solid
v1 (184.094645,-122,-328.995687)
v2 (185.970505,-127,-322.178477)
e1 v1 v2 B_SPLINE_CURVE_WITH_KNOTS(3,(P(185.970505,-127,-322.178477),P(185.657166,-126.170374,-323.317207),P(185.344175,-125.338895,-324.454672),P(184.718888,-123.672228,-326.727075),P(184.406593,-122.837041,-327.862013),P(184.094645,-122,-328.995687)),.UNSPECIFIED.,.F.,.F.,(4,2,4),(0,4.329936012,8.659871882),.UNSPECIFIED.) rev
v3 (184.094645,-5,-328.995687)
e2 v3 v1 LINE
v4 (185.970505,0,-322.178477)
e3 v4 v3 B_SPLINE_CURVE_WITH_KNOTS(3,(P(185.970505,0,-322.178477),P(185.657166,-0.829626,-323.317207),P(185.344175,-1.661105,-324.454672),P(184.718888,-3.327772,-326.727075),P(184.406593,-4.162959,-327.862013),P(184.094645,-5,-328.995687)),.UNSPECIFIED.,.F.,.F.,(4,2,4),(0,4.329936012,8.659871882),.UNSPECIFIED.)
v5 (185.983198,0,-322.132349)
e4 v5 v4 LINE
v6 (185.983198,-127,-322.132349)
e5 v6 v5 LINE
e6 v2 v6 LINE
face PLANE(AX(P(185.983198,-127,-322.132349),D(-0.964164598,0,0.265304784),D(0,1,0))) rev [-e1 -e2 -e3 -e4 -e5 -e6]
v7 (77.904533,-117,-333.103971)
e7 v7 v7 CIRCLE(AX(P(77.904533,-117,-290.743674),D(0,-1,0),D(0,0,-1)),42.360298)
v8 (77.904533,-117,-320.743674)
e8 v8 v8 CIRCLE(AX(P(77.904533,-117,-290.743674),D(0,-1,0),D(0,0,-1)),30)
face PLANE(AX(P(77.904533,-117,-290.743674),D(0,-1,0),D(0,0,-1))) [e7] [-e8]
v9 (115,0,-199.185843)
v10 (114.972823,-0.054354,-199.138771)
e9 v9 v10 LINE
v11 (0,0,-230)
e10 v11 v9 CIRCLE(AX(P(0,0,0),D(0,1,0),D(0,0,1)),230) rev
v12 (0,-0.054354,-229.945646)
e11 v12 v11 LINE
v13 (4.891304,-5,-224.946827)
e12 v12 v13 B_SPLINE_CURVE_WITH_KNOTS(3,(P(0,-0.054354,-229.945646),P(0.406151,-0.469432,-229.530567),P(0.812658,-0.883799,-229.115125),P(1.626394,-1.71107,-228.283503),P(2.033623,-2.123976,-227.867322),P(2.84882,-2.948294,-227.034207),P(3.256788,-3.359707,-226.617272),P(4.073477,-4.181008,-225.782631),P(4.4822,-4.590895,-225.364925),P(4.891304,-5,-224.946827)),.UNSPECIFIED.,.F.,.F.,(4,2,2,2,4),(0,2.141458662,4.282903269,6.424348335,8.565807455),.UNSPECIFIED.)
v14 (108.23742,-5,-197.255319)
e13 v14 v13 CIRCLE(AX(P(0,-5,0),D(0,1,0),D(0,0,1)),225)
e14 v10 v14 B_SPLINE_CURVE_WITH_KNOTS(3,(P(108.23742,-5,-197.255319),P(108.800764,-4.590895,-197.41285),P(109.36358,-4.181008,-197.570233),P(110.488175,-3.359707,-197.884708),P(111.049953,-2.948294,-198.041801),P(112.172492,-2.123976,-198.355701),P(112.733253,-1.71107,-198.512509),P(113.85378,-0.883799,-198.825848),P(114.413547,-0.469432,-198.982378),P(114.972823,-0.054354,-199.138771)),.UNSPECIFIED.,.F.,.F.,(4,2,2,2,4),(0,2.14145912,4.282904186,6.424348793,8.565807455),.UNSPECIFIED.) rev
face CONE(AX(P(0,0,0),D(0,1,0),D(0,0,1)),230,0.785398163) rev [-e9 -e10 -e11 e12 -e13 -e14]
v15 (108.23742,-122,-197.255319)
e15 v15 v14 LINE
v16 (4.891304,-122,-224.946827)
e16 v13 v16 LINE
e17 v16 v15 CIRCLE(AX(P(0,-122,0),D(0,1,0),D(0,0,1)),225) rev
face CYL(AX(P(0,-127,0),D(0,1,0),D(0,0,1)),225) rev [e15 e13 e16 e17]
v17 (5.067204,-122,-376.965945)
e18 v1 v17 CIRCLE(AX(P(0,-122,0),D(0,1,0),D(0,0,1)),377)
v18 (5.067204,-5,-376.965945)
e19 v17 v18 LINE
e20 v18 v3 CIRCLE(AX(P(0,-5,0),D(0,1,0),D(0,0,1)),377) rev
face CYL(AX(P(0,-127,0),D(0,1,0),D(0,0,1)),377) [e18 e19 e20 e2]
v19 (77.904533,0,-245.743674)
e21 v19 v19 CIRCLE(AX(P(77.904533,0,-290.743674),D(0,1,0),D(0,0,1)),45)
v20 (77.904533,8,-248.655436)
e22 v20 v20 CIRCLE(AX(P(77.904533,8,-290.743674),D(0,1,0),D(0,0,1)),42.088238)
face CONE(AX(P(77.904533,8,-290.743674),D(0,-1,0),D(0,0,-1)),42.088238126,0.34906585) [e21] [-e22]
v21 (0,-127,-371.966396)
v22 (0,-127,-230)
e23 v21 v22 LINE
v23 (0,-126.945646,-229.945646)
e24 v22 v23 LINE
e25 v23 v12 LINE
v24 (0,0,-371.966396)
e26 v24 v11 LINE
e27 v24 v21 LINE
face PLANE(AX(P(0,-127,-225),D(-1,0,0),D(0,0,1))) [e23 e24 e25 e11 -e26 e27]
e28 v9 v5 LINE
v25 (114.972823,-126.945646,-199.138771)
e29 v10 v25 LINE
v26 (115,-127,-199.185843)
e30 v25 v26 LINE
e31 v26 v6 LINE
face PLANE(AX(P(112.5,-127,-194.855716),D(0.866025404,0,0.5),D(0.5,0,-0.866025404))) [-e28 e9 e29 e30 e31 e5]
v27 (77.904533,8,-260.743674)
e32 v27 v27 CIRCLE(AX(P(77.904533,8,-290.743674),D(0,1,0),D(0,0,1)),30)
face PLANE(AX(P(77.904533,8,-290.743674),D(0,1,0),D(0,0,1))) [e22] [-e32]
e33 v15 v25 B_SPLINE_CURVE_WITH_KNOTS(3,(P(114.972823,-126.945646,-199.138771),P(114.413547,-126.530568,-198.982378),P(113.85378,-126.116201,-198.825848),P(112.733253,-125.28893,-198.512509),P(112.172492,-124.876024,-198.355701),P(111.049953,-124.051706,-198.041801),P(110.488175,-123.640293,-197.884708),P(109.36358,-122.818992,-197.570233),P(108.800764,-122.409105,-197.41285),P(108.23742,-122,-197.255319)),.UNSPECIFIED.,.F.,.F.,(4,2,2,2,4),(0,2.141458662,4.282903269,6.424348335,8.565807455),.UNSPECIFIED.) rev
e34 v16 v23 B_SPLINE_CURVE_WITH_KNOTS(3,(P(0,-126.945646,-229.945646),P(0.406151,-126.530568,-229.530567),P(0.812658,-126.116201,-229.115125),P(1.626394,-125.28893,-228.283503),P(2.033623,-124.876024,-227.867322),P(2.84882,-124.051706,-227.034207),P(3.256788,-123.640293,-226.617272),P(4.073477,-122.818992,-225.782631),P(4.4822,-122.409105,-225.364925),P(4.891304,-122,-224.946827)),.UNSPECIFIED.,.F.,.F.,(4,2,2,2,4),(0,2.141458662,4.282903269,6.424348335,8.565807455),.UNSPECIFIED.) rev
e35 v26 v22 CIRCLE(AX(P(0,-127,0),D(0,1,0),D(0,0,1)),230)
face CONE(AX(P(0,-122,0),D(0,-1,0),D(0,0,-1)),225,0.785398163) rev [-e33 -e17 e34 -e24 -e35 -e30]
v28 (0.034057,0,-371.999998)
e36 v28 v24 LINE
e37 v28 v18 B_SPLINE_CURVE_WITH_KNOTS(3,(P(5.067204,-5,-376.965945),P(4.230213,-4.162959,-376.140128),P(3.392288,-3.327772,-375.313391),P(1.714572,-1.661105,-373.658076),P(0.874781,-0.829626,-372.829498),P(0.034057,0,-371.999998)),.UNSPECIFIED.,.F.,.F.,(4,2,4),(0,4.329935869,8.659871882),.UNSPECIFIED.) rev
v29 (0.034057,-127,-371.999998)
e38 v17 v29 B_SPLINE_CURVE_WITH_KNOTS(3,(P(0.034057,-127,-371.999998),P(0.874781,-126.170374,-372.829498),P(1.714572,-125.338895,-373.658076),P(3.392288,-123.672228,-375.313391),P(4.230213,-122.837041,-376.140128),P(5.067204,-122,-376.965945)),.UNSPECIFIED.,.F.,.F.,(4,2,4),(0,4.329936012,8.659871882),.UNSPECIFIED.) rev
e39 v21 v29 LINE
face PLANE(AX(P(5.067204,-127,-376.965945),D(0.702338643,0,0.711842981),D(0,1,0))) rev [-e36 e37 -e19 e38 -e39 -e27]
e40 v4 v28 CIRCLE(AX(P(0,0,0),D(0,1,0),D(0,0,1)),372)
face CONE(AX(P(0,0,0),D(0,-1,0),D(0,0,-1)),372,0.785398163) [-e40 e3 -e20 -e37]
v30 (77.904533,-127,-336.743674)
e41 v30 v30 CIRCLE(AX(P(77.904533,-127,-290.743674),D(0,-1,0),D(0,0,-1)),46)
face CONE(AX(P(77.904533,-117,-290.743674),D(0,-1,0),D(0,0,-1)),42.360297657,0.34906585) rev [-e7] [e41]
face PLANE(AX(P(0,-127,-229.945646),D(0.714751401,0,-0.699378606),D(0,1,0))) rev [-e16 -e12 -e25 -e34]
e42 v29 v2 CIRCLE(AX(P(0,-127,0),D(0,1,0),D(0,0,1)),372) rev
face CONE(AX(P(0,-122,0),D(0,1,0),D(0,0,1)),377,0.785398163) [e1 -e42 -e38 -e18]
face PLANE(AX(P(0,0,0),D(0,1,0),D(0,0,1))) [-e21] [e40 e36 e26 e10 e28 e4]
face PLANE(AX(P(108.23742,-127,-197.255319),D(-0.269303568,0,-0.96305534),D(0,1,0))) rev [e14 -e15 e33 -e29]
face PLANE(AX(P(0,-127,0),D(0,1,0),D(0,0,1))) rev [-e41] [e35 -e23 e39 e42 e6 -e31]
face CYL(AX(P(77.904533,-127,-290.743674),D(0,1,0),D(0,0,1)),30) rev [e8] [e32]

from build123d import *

# Parameters (mm, degrees)
SKETCH1_R           = 30
BOSS_EXTRUDE1_DEPTH = 127
BOSS_EXTRUDE2_START = 8
SKETCH3_R           = 45
SKETCH3_R_2         = 30
BOSS_EXTRUDE2_DEPTH = 8
CHAMFER1_SIZE2      = 8
CHAMFER1_SIZE       = 2.911761874
CUT_EXTRUDE1_START  = -10
SKETCH4_R           = 46
SKETCH4_R_2         = 30
CUT_EXTRUDE1_DEPTH  = 10
CHAMFER2_SIZE2      = 10
CHAMFER2_SIZE       = 3.639702343


# Some blends are built 0.0001 mm under size
with BuildPart() as part:
    # Sketch1 → Boss-Extrude1 (new body)
    with BuildSketch(Plane(origin=(0, 0, 0), x_dir=(1, 0, 0), z_dir=(0, 1, 0))):
        with BuildLine():
            Line((112.5, 194.855715851), (188.5, 326.491577227))
            ThreePointArc((188.5, 326.491577227), (97.574780004, 364.154036511), (0, 377))
            Line((0, 377), (0, 225))
            ThreePointArc((0, 225), (58.234285148, 217.333310915), (112.5, 194.855715851))
        make_face()
        with Locations(Location((77.904532576, 290.743673713, 0), (0, 0, 270))):
            Circle(SKETCH1_R, mode=Mode.SUBTRACT)
    extrude(amount=-BOSS_EXTRUDE1_DEPTH)

    # Sketch3 → Boss-Extrude2 (add)
    with BuildSketch(Plane(origin=(0, 0, 0), x_dir=(1, 0, 0), z_dir=(0, 1, 0)).offset(BOSS_EXTRUDE2_START)):
        with Locations(Location((77.904532576, 290.743673713, 0), (0, 0, 270))):
            Circle(SKETCH3_R)
        with Locations(Location((77.904532576, 290.743673713, 0), (0, 0, 270))):
            Circle(SKETCH3_R_2, mode=Mode.SUBTRACT)
    extrude(amount=-BOSS_EXTRUDE2_DEPTH)

    # Chamfer1
    chamfer1_edges = [part.edges().sort_by_distance(p)[0] for p in [
        (77.904532576, 8, -335.743673713),
    ]]
    chamfer1_side = [part.faces().sort_by_distance(p)[0] for p in [
        (77.904532576, 8, -335.685438476),
    ]]
    chamfer(chamfer1_edges, length=CHAMFER1_SIZE - 0.0001, length2=CHAMFER1_SIZE2 - 0.0001, reference=chamfer1_side[0])  # a hair under: the kernel refuses the full size

    # Sketch4 → Cut-Extrude1 (cut)
    with BuildSketch(Plane.XZ.offset(127).offset(CUT_EXTRUDE1_START)):
        with Locations(Location((77.904532576, -290.743673713, 0), (0, 0, 270))):
            Circle(SKETCH4_R)
        with Locations(Location((77.904532576, -290.743673713, 0), (0, 0, 90))):
            Circle(SKETCH4_R_2, mode=Mode.SUBTRACT)
    extrude(amount=CUT_EXTRUDE1_DEPTH, mode=Mode.SUBTRACT)

    # Chamfer2
    chamfer2_edges = [part.edges().sort_by_distance(p)[0] for p in [
        (77.904532576, -117, -244.743673713),
    ]]
    chamfer2_side = [part.faces().sort_by_distance(p)[0] for p in [
        (77.904532576, -117, -244.81646776),
    ]]
    chamfer(chamfer2_edges, length=CHAMFER2_SIZE - 0.0001, length2=CHAMFER2_SIZE2 - 0.0001, reference=chamfer2_side[0])  # a hair under: the kernel refuses the full size

    # Chamfer3
    # the kernel refuses this chamfer: 5 mm, written as the material it takes off along each edge
    with BuildSketch(Plane(origin=(0, -127, 0), x_dir=(0.5292424705918727, 0, -0.8484706284379036), z_dir=(0.8484706284379036, 0, 0.5292424705918727))) as chamfer3_piece_1:
        with BuildLine():
            Line((371.858578644, -0.141421356), (377.141421356, 5.141421356))
            Line((377.141421356, 5.141421356), (377.241421356, 5.141421356))
            ThreePointArc((377.241421356, 5.141421356), (377.1, 2.570710678), (377.1, 0))
            Line((377.1, 0), (377, -0.1))
            ThreePointArc((377, -0.1), (374.429289322, -0.1), (371.858578644, -0.241421356))
            Line((371.858578644, -0.241421356), (371.858578644, -0.141421356))
        make_face()
    revolve(axis=Axis((0, -127, 0), (0, 1, 0)), revolution_arc=33.908571791, mode=Mode.SUBTRACT)
    with BuildSketch(Plane(origin=(0, -127, 0), x_dir=(-0.05711995451760951, 0, -0.9983673225801746), z_dir=(-0.9983673225801746, 0, 0.05711995451760951))) as chamfer3_piece_2:
        with BuildLine():
            Line((230.141421356, 0.141421356), (224.858578644, -5.141421356))
            Line((224.858578644, -5.141421356), (224.758578644, -5.141421356))
            ThreePointArc((224.758578644, -5.141421356), (224.9, -2.570710678), (224.9, 0))
            Line((224.9, 0), (225, 0.1))
            ThreePointArc((225, 0.1), (227.570710678, 0.1), (230.141421356, 0.241421356))
            Line((230.141421356, 0.241421356), (230.141421356, 0.141421356))
        make_face()
    revolve(axis=Axis((0, -127, 0), (0, -1, 0)), revolution_arc=36.549029178, mode=Mode.SUBTRACT)
    with BuildSketch(Plane(origin=(0, 0, 0), x_dir=(0.5292424705918727, 0, -0.8484706284379036), z_dir=(0.8484706284379036, 0, 0.5292424705918727))) as chamfer3_piece_3:
        with BuildLine():
            Line((377.141421356, -5.141421356), (371.858578644, 0.141421356))
            Line((371.858578644, 0.141421356), (371.858578644, 0.241421356))
            ThreePointArc((371.858578644, 0.241421356), (374.429289322, 0.1), (377, 0.1))
            Line((377, 0.1), (377.1, 0))
            ThreePointArc((377.1, 0), (377.1, -2.570710678), (377.241421356, -5.141421356))
            Line((377.241421356, -5.141421356), (377.141421356, -5.141421356))
        make_face()
    revolve(axis=Axis((0, 0, 0), (0, 1, 0)), revolution_arc=33.908571791, mode=Mode.SUBTRACT)
    with BuildSketch(Plane(origin=(0, 0, 0), x_dir=(-0.05711995451760943, 0, -0.9983673225801746), z_dir=(-0.9983673225801746, 0, 0.05711995451760943))) as chamfer3_piece_4:
        with BuildLine():
            Line((224.858578644, 5.141421356), (230.141421356, -0.141421356))
            Line((230.141421356, -0.141421356), (230.141421356, -0.241421356))
            ThreePointArc((230.141421356, -0.241421356), (227.570710678, -0.1), (225, -0.1))
            Line((225, -0.1), (224.9, 0))
            ThreePointArc((224.9, 0), (224.9, 2.570710678), (224.758578644, 5.141421356))
            Line((224.758578644, 5.141421356), (224.858578644, 5.141421356))
        make_face()
    revolve(axis=Axis((0, 0, 0), (0, -1, 0)), revolution_arc=36.549029178, mode=Mode.SUBTRACT)
    with BuildSketch(Plane(origin=(0, 12.726295315, -225), x_dir=(-0.027477698296736765, 0, -0.9996224167636066), z_dir=(0, -1, 0))) as chamfer3_piece_5:
        with BuildLine():
            Line((5.090518126, 0), (-0.33429411, 5.023891374))
            Line((-0.33429411, 5.023891374), (-0.434172994, 5.018971161))
            ThreePointArc((-0.434172994, 5.018971161), (-0.183141977, 2.511326919), (-0.099962242, -0.00274777))
            Line((-0.099962242, -0.00274777), (0.00274777, -0.099962242))
            ThreePointArc((0.00274777, -0.099962242), (2.546085101, -0.030050788), (5.093265896, -0.099962242))
            Line((5.093265896, -0.099962242), (5.090518126, 0))
        make_face()
    extrude(amount=152.452590629, mode=Mode.SUBTRACT)
    with BuildSketch(Plane(origin=(0, 13.026648977, -377), x_dir=(-0.0275053668618043, 0, 0.9996216558247413), z_dir=(0, -1, 0))) as chamfer3_piece_6:
        with BuildLine():
            Line((5.176029718, 0), (-0.249663351, -5.204674974))
            Line((-0.249663351, -5.204674974), (-0.349653457, -5.203268263))
            ThreePointArc((-0.349653457, -5.203268263), (-0.162620276, -2.601558906), (-0.099962166, 0.002750537))
            Line((-0.099962166, 0.002750537), (0.002750537, 0.099962166))
            ThreePointArc((0.002750537, 0.099962166), (2.588807445, 0.0288048), (5.178780254, 0.099962166))
            Line((5.178780254, 0.099962166), (5.176029718, 0))
        make_face()
    extrude(amount=153.053297954, mode=Mode.SUBTRACT)
    with BuildSketch(Plane(origin=(188.5, 13.026648977, -326.491577227), x_dir=(-0.8556337629027079, 0, -0.5175817459889334), z_dir=(0, -1, 0))) as chamfer3_piece_7:
        with BuildLine():
            Line((5.210659591, 0), (-0.248004097, -5.170084874))
            Line((-0.248004097, -5.170084874), (-0.347983242, -5.168042668))
            ThreePointArc((-0.347983242, -5.168042668), (-0.152811741, -2.584453961), (-0.099979145, 0.002042206))
            Line((-0.099979145, 0.002042206), (0.002042206, 0.099979145))
            ThreePointArc((0.002042206, 0.099979145), (2.60636271, 0.037782504), (5.214045418, 0.099942664))
            Line((5.214045418, 0.099942664), (5.210659591, 0))
        make_face()
    extrude(amount=153.053297954, mode=Mode.SUBTRACT)
    with BuildSketch(Plane(origin=(112.5, 12.726295315, -194.855715851), x_dir=(-0.8848441204167522, 0, -0.46588719939906503), z_dir=(0, -1, 0))) as chamfer3_piece_8:
        with BuildLine():
            Line((5.0350012, 0), (-0.337980103, 5.0792858))
            Line((-0.337980103, 5.0792858), (-0.437904212, 5.075390609))
            ThreePointArc((-0.437904212, 5.075390609), (-0.199029377, 2.538471922), (-0.099924109, -0.003895191))
            Line((-0.099924109, -0.003895191), (0.003895191, -0.099924109))
            ThreePointArc((0.003895191, -0.099924109), (2.517945165, -0.016000711), (5.036723207, -0.099985172))
            Line((5.036723207, -0.099985172), (5.0350012, 0))
        make_face()
    extrude(amount=152.452590629, mode=Mode.SUBTRACT)


solid = part.part
